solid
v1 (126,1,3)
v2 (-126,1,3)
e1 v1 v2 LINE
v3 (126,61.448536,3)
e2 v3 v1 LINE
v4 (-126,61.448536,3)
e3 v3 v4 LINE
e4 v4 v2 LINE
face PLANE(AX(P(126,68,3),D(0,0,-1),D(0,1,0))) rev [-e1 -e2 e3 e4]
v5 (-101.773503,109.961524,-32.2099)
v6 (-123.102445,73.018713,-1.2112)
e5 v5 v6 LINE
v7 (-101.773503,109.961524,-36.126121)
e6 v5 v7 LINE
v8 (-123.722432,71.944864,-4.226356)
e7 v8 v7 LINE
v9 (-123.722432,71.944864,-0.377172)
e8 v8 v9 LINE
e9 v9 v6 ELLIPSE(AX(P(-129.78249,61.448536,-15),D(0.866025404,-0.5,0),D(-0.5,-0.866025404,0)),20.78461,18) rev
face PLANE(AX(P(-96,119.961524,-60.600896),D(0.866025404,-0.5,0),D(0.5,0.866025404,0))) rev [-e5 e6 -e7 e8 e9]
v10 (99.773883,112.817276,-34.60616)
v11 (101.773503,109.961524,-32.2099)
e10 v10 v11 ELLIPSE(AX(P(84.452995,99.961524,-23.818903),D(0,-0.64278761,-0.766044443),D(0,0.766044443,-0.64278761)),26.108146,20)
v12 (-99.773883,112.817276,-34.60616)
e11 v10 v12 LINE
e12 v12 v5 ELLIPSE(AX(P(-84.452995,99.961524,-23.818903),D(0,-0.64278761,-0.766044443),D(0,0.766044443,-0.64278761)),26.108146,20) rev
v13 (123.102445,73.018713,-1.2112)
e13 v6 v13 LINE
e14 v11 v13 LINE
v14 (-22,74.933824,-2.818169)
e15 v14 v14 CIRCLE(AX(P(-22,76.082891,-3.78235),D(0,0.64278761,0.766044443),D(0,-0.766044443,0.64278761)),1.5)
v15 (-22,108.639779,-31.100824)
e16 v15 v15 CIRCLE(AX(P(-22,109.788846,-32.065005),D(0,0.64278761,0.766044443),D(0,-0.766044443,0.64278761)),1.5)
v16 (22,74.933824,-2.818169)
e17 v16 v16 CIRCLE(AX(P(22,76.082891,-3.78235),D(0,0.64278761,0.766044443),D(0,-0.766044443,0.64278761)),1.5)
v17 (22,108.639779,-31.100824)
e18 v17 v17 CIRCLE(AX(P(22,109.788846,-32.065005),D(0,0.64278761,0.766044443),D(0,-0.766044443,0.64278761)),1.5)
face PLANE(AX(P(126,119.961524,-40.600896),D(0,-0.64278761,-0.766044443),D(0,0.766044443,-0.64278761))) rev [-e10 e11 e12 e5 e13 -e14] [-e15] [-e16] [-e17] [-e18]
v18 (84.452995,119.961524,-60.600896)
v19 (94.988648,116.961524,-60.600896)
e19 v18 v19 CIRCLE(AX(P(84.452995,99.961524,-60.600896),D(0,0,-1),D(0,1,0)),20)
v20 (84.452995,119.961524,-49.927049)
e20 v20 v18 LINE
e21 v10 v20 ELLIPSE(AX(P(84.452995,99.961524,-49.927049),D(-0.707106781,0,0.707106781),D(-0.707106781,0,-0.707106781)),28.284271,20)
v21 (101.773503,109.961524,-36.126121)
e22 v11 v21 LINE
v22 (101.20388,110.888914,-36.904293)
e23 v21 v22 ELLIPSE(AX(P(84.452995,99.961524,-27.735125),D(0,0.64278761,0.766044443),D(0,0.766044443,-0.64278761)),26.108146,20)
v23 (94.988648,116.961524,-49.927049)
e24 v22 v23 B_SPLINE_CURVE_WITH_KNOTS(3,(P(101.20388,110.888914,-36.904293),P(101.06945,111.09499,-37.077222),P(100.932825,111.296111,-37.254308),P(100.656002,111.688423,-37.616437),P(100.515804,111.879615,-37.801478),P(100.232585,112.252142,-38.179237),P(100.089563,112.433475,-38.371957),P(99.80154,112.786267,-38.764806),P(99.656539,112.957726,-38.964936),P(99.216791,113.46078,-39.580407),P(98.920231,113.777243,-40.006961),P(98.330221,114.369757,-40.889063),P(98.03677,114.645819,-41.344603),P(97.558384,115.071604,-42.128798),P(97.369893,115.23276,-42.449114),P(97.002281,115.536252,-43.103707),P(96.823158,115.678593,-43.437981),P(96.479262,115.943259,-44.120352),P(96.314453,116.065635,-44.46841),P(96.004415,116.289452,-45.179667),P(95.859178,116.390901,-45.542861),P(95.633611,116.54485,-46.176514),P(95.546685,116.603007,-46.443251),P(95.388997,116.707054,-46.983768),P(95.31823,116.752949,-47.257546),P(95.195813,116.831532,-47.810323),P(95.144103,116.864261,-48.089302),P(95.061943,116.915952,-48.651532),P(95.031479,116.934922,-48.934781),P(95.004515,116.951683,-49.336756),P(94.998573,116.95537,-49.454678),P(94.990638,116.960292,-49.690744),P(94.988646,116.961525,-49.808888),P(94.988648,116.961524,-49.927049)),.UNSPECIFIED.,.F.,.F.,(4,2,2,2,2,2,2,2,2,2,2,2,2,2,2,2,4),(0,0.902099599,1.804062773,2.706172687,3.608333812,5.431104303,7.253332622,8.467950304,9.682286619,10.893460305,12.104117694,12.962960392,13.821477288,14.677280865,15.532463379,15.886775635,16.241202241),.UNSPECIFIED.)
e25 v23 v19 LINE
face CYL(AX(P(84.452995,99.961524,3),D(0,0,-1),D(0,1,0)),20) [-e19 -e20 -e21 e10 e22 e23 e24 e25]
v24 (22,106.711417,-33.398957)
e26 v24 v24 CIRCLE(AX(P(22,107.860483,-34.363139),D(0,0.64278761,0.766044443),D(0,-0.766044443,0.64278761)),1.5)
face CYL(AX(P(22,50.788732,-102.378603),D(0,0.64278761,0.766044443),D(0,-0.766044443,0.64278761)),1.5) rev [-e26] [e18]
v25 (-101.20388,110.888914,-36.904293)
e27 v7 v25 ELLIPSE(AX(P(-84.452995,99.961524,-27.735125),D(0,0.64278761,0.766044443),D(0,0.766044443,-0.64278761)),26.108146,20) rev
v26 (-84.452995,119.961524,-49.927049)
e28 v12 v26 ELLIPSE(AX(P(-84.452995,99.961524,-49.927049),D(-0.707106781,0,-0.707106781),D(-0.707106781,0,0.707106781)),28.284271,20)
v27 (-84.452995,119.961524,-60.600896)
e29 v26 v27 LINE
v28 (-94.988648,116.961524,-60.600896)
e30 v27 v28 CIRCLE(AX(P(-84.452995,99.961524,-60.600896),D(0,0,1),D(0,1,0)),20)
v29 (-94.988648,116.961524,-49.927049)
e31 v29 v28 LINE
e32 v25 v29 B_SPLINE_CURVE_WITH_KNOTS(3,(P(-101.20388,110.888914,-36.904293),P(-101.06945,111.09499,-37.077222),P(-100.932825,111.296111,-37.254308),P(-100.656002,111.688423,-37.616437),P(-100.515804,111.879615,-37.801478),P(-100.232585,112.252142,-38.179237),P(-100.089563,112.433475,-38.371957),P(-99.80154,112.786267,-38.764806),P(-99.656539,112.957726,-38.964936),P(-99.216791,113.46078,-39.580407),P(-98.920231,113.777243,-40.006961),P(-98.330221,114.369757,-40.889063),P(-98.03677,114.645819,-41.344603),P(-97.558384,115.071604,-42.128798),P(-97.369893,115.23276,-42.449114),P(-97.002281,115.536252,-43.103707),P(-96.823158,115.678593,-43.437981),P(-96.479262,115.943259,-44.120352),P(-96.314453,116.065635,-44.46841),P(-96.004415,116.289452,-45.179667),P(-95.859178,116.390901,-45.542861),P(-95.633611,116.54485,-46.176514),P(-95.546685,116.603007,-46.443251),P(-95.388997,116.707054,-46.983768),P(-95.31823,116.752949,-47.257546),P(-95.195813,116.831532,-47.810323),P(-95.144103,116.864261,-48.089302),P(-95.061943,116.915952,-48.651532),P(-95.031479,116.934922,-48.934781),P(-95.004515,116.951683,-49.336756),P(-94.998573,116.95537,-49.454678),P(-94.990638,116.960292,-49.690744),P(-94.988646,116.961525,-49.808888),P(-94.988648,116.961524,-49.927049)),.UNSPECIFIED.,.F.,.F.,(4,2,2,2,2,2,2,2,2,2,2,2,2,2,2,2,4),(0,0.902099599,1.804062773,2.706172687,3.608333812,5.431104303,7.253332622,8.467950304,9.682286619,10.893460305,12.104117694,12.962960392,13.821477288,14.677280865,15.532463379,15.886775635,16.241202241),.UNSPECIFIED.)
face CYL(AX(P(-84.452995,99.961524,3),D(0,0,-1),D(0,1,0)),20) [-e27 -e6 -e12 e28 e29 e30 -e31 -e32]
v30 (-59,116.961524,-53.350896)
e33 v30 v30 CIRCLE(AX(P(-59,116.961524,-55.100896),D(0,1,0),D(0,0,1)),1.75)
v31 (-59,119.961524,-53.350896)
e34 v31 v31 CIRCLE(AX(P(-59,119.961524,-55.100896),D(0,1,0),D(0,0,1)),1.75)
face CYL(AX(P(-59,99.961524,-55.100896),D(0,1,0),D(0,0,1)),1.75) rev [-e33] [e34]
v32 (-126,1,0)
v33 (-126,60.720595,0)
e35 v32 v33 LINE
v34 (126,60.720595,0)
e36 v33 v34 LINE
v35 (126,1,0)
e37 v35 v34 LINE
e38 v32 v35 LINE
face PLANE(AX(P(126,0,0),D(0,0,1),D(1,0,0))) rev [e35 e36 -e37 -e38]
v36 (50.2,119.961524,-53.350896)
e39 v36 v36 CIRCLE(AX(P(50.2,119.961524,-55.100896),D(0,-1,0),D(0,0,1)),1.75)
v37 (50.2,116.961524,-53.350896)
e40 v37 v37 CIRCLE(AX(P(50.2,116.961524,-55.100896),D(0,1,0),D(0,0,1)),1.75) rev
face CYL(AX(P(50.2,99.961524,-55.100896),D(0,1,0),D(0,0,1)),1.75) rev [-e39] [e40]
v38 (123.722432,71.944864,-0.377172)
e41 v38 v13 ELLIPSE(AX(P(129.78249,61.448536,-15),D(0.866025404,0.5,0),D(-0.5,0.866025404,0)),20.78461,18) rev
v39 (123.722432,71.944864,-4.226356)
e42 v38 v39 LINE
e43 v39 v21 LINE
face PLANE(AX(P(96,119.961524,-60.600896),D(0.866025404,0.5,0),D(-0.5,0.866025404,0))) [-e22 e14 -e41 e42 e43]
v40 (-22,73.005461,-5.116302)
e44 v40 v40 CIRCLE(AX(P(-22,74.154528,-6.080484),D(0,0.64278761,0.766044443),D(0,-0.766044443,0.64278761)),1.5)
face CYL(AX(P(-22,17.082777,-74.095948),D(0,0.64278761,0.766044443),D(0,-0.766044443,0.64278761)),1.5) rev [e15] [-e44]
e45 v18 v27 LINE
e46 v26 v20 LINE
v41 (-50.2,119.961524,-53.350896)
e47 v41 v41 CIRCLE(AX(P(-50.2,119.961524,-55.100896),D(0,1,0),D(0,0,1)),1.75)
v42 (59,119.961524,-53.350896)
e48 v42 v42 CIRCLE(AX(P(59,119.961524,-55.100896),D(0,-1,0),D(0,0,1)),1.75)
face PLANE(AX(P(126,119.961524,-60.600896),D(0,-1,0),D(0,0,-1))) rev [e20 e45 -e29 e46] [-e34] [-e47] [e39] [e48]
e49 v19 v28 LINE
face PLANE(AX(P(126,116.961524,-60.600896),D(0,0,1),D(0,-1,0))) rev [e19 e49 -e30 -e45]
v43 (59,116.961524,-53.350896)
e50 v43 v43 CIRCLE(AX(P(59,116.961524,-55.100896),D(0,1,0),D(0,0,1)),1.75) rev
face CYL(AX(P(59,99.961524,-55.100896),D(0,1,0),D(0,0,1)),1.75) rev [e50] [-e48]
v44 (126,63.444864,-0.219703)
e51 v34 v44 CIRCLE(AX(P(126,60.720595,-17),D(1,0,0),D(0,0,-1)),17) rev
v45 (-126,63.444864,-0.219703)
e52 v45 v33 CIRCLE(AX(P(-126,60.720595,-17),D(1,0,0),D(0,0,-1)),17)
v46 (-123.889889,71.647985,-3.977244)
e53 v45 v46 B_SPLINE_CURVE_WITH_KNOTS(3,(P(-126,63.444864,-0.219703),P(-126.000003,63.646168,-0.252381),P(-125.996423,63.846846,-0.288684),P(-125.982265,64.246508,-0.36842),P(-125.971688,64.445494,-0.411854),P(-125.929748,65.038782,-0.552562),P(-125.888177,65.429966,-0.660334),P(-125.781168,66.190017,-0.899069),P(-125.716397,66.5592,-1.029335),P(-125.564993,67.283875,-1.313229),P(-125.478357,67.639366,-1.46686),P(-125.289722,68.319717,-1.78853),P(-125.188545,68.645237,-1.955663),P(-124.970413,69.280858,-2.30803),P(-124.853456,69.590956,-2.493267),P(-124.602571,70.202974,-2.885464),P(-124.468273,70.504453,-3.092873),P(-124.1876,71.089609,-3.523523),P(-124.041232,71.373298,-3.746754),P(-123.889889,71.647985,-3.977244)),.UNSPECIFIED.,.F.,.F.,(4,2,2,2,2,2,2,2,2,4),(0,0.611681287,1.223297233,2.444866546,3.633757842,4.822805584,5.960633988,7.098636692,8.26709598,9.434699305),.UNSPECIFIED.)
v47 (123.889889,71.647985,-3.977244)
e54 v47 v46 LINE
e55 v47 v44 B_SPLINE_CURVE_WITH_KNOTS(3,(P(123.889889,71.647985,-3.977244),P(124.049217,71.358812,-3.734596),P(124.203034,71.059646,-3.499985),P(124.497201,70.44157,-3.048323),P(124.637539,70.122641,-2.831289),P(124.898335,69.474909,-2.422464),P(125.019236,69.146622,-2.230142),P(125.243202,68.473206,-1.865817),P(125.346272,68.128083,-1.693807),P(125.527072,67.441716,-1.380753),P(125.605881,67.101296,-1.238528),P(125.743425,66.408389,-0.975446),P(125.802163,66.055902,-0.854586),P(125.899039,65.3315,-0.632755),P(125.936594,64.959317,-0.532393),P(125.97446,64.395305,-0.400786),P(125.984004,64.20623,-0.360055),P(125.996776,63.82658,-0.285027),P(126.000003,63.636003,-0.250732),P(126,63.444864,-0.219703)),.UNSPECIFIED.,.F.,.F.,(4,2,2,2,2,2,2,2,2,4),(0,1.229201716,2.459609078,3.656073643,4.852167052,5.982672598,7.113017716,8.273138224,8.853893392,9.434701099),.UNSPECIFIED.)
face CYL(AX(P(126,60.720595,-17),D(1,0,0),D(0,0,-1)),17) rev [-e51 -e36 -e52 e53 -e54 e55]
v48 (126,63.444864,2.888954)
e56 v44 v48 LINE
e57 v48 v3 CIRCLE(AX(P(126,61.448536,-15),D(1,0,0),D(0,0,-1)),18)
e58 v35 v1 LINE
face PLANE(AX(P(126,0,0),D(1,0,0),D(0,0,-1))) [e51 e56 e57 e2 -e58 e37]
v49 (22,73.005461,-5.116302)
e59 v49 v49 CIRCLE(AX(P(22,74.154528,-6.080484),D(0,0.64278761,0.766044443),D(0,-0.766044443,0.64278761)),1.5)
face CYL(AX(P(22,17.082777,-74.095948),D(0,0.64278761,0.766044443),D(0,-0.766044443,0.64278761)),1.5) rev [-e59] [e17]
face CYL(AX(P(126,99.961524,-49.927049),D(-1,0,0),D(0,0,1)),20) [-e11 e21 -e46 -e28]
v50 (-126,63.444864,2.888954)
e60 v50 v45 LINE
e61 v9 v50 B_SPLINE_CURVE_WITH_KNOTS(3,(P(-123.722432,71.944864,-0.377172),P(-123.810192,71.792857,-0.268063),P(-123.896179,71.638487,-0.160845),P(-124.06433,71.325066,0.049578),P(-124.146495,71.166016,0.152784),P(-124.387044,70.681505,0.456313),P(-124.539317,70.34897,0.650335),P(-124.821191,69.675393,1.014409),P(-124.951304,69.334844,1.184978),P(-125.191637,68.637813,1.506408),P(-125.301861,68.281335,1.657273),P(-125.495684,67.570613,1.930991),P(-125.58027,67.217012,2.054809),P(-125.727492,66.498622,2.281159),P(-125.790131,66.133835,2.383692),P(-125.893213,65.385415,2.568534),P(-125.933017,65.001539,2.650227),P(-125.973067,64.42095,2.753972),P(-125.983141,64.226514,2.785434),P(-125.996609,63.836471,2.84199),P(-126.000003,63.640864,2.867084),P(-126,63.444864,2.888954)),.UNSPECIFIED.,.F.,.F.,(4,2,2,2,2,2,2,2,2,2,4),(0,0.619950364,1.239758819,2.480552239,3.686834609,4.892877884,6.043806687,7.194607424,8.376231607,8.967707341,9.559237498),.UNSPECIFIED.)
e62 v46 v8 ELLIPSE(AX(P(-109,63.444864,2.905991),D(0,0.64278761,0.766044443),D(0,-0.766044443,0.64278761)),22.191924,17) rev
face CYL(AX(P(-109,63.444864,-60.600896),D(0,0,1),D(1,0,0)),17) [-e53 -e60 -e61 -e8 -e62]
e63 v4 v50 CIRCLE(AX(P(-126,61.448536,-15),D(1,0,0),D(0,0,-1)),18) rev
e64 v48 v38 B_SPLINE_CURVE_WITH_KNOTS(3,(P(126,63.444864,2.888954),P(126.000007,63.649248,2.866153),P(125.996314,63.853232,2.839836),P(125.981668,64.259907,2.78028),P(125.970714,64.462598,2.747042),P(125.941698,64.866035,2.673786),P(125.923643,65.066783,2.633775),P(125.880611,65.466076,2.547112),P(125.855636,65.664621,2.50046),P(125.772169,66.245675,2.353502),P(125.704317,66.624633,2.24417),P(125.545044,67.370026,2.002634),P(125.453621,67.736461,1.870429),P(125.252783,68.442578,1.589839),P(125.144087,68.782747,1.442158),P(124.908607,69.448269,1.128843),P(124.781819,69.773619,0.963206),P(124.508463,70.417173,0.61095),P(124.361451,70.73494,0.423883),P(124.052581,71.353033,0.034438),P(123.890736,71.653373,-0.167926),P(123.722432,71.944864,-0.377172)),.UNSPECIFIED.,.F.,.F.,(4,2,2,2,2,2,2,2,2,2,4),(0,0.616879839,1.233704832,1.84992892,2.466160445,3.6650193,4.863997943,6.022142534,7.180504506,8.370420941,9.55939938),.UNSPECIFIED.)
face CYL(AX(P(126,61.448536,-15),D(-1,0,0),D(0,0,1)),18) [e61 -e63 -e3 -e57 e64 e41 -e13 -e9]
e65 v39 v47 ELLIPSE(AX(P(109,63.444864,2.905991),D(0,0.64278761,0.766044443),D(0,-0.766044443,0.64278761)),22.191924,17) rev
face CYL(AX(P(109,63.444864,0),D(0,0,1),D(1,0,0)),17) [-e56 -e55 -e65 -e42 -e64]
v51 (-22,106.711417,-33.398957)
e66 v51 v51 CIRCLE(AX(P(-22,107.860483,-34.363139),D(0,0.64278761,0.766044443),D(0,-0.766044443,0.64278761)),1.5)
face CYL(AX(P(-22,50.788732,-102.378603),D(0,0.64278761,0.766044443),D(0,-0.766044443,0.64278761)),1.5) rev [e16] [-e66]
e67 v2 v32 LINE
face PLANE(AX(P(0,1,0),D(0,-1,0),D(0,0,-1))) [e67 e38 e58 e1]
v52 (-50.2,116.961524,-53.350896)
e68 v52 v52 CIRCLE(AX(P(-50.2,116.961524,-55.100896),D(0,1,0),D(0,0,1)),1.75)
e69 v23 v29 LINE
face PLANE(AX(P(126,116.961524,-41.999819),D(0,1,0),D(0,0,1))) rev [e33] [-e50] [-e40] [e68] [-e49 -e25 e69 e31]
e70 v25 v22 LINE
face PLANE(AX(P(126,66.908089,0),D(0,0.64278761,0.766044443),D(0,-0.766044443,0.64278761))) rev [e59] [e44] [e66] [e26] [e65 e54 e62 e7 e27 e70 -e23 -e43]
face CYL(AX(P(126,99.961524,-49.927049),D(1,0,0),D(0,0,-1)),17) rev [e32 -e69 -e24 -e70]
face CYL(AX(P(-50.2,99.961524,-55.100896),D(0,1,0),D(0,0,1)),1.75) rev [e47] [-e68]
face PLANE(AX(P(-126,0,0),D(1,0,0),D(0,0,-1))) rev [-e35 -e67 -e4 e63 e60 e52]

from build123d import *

# Parameters (mm, degrees)
SALIENTE_EXTRUIR1_DEPTH = 126
REDONDEO1_R             = 18
REDONDEO2_R             = 20
REDONDEO3_R             = 17
REDONDEO4_R             = 17
CORTAR_EXTRUIR1_DEPTH   = 186.234557368
REDONDEO5_R             = 17
CORTAR_EXTRUIR2_DEPTH   = 186.23455747
CROQUIS6_R              = 1.75
CORTAR_EXTRUIR3_DEPTH   = 20
CROQUIS7_W              = 252
CROQUIS7_H              = 3
CORTAR_EXTRUIR4_DEPTH   = 1
CROQUIS9_R              = 1.5
CORTAR_EXTRUIR5_DEPTH   = 183.297245602


with BuildPart() as part:
    # Croquis1 → Saliente-Extruir1 (new, symmetric)
    with BuildSketch(Plane(origin=(0, 0, 0), x_dir=(0, 0, -1), z_dir=(1, 0, 0))):
        Polygon((0, 0), (0, 66.908089297), (41.999818789, 116.961524227), (60.600895814, 116.961524227), (60.600895814, 119.961524227), (40.600895814, 119.961524227), (-3, 68), (-3, 0), align=None)
    extrude(amount=SALIENTE_EXTRUIR1_DEPTH, both=True)

    # Redondeo1
    redondeo1_edges = [part.edges().sort_by_distance(p)[0] for p in [
        (0, 68, 3),
    ]]
    fillet(redondeo1_edges, radius=REDONDEO1_R)

    # Redondeo2
    redondeo2_edges = [part.edges().sort_by_distance(p)[0] for p in [
        (0, 119.961524227, -40.600895814),
    ]]
    fillet(redondeo2_edges, radius=REDONDEO2_R)

    # Redondeo3
    redondeo3_edges = [part.edges().sort_by_distance(p)[0] for p in [
        (0, 116.961524227, -41.999818789),
    ]]
    fillet(redondeo3_edges, radius=REDONDEO3_R)

    # Redondeo4
    redondeo4_edges = [part.edges().sort_by_distance(p)[0] for p in [
        (0, 66.908089297, 0),
    ]]
    fillet(redondeo4_edges, radius=REDONDEO4_R)

    # Croquis2 → Cortar-Extruir1 (cut, through all)
    with BuildSketch(Plane.XY.offset(3)):
        Polygon((-96, 119.961524227), (-126, 68), (-126, 119.961524227), align=None)
    cortar_extruir1 = extrude(amount=-CORTAR_EXTRUIR1_DEPTH, mode=Mode.SUBTRACT)

    # Simetría1: Cortar-Extruir1 across plane
    add(cortar_extruir1.mirror(Plane(origin=(0, 0, 0), x_dir=(0, 0, 1), z_dir=(1, 0, 0))), mode=Mode.SUBTRACT)

    # Redondeo5
    # the kernel refuses this fillet: 17 mm, written as the material it takes off along each edge
    with BuildSketch(Plane(origin=(-126, 68, 13.153231119), x_dir=(0, -1, 0), z_dir=(0, 0, -1)), Plane(origin=(126, 68, 13.153231119), x_dir=(-0.49999999999999856, 0.8660254037844395, 0), z_dir=(0, 0, -1))) as redondeo5_piece_1:
        with BuildLine():
            CenterArc((REDONDEO5_R * 0.267949192431, -REDONDEO5_R), REDONDEO5_R, 90, 30)
            Line((-REDONDEO5_R * 0.232050807569, -REDONDEO5_R * 0.133974596216), (0, 0))
            Line((0, 0), (REDONDEO5_R * 0.267949192431, 0))
        make_face()
    extrude(amount=26.178446129, mode=Mode.SUBTRACT)

    # Croquis5 → Cortar-Extruir2 (cut, through all)
    with BuildSketch(Plane(origin=(0, 0, -60.600895814), x_dir=(-1, 0, 0), z_dir=(0, 0, -1))):
        with BuildLine():
            Line((84.452994616, 119.961524227), (96, 119.961524227))
            Line((96, 119.961524227), (101.773502692, 109.961524227))
            ThreePointArc((101.773502692, 109.961524227), (94.452994616, 117.282032303), (84.452994616, 119.961524227))
        make_face()
    cortar_extruir2 = extrude(amount=-CORTAR_EXTRUIR2_DEPTH, mode=Mode.SUBTRACT)

    # Simetría2: Cortar-Extruir2 across plane
    add(cortar_extruir2.mirror(Plane(origin=(0, 0, 0), x_dir=(0, 0, 1), z_dir=(1, 0, 0))), mode=Mode.SUBTRACT)

    # Croquis6 → Cortar-Extruir3 (cut)
    with BuildSketch(Plane(origin=(0, 119.961524227, 0), x_dir=(1, 0, 0), z_dir=(0, 1, 0))):
        with Locations(Location((-59, 55.100895814, 0), (0, 0, 270))):
            Circle(CROQUIS6_R)
        with Locations(Location((-50.2, 55.100895814, 0), (0, 0, 270))):
            Circle(CROQUIS6_R)
    cortar_extruir3 = extrude(amount=-CORTAR_EXTRUIR3_DEPTH, mode=Mode.SUBTRACT)

    # Simetría3: Cortar-Extruir3 across plane
    add(cortar_extruir3.mirror(Plane(origin=(0, 0, 0), x_dir=(0, 0, 1), z_dir=(1, 0, 0))), mode=Mode.SUBTRACT)

    # Croquis7 → Cortar-Extruir4 (cut)
    with BuildSketch(Plane.XZ):
        with Locations((0, 1.5)):
            Rectangle(CROQUIS7_W, CROQUIS7_H)
    extrude(amount=-CORTAR_EXTRUIR4_DEPTH, mode=Mode.SUBTRACT)

    # Croquis9 → Cortar-Extruir5 (cut, through all)
    with BuildSketch(Plane(origin=(0, 29.573173589, 35.243935869), x_dir=(1, 0, 0), z_dir=(0, 0.6427876096865381, 0.7660444431189791))):
        with Locations(Location((-22, 104.71412352, 0), (0, 0, 270))):
            Circle(CROQUIS9_R)
        with Locations(Location((22, 104.71412352, 0), (0, 0, 270))):
            Circle(CROQUIS9_R)
        with Locations(Location((22, 60.71412352, 0), (0, 0, 270))):
            Circle(CROQUIS9_R)
        with Locations(Location((-22, 60.71412352, 0), (0, 0, 270))):
            Circle(CROQUIS9_R)
    extrude(amount=-CORTAR_EXTRUIR5_DEPTH, mode=Mode.SUBTRACT)


solid = part.part
